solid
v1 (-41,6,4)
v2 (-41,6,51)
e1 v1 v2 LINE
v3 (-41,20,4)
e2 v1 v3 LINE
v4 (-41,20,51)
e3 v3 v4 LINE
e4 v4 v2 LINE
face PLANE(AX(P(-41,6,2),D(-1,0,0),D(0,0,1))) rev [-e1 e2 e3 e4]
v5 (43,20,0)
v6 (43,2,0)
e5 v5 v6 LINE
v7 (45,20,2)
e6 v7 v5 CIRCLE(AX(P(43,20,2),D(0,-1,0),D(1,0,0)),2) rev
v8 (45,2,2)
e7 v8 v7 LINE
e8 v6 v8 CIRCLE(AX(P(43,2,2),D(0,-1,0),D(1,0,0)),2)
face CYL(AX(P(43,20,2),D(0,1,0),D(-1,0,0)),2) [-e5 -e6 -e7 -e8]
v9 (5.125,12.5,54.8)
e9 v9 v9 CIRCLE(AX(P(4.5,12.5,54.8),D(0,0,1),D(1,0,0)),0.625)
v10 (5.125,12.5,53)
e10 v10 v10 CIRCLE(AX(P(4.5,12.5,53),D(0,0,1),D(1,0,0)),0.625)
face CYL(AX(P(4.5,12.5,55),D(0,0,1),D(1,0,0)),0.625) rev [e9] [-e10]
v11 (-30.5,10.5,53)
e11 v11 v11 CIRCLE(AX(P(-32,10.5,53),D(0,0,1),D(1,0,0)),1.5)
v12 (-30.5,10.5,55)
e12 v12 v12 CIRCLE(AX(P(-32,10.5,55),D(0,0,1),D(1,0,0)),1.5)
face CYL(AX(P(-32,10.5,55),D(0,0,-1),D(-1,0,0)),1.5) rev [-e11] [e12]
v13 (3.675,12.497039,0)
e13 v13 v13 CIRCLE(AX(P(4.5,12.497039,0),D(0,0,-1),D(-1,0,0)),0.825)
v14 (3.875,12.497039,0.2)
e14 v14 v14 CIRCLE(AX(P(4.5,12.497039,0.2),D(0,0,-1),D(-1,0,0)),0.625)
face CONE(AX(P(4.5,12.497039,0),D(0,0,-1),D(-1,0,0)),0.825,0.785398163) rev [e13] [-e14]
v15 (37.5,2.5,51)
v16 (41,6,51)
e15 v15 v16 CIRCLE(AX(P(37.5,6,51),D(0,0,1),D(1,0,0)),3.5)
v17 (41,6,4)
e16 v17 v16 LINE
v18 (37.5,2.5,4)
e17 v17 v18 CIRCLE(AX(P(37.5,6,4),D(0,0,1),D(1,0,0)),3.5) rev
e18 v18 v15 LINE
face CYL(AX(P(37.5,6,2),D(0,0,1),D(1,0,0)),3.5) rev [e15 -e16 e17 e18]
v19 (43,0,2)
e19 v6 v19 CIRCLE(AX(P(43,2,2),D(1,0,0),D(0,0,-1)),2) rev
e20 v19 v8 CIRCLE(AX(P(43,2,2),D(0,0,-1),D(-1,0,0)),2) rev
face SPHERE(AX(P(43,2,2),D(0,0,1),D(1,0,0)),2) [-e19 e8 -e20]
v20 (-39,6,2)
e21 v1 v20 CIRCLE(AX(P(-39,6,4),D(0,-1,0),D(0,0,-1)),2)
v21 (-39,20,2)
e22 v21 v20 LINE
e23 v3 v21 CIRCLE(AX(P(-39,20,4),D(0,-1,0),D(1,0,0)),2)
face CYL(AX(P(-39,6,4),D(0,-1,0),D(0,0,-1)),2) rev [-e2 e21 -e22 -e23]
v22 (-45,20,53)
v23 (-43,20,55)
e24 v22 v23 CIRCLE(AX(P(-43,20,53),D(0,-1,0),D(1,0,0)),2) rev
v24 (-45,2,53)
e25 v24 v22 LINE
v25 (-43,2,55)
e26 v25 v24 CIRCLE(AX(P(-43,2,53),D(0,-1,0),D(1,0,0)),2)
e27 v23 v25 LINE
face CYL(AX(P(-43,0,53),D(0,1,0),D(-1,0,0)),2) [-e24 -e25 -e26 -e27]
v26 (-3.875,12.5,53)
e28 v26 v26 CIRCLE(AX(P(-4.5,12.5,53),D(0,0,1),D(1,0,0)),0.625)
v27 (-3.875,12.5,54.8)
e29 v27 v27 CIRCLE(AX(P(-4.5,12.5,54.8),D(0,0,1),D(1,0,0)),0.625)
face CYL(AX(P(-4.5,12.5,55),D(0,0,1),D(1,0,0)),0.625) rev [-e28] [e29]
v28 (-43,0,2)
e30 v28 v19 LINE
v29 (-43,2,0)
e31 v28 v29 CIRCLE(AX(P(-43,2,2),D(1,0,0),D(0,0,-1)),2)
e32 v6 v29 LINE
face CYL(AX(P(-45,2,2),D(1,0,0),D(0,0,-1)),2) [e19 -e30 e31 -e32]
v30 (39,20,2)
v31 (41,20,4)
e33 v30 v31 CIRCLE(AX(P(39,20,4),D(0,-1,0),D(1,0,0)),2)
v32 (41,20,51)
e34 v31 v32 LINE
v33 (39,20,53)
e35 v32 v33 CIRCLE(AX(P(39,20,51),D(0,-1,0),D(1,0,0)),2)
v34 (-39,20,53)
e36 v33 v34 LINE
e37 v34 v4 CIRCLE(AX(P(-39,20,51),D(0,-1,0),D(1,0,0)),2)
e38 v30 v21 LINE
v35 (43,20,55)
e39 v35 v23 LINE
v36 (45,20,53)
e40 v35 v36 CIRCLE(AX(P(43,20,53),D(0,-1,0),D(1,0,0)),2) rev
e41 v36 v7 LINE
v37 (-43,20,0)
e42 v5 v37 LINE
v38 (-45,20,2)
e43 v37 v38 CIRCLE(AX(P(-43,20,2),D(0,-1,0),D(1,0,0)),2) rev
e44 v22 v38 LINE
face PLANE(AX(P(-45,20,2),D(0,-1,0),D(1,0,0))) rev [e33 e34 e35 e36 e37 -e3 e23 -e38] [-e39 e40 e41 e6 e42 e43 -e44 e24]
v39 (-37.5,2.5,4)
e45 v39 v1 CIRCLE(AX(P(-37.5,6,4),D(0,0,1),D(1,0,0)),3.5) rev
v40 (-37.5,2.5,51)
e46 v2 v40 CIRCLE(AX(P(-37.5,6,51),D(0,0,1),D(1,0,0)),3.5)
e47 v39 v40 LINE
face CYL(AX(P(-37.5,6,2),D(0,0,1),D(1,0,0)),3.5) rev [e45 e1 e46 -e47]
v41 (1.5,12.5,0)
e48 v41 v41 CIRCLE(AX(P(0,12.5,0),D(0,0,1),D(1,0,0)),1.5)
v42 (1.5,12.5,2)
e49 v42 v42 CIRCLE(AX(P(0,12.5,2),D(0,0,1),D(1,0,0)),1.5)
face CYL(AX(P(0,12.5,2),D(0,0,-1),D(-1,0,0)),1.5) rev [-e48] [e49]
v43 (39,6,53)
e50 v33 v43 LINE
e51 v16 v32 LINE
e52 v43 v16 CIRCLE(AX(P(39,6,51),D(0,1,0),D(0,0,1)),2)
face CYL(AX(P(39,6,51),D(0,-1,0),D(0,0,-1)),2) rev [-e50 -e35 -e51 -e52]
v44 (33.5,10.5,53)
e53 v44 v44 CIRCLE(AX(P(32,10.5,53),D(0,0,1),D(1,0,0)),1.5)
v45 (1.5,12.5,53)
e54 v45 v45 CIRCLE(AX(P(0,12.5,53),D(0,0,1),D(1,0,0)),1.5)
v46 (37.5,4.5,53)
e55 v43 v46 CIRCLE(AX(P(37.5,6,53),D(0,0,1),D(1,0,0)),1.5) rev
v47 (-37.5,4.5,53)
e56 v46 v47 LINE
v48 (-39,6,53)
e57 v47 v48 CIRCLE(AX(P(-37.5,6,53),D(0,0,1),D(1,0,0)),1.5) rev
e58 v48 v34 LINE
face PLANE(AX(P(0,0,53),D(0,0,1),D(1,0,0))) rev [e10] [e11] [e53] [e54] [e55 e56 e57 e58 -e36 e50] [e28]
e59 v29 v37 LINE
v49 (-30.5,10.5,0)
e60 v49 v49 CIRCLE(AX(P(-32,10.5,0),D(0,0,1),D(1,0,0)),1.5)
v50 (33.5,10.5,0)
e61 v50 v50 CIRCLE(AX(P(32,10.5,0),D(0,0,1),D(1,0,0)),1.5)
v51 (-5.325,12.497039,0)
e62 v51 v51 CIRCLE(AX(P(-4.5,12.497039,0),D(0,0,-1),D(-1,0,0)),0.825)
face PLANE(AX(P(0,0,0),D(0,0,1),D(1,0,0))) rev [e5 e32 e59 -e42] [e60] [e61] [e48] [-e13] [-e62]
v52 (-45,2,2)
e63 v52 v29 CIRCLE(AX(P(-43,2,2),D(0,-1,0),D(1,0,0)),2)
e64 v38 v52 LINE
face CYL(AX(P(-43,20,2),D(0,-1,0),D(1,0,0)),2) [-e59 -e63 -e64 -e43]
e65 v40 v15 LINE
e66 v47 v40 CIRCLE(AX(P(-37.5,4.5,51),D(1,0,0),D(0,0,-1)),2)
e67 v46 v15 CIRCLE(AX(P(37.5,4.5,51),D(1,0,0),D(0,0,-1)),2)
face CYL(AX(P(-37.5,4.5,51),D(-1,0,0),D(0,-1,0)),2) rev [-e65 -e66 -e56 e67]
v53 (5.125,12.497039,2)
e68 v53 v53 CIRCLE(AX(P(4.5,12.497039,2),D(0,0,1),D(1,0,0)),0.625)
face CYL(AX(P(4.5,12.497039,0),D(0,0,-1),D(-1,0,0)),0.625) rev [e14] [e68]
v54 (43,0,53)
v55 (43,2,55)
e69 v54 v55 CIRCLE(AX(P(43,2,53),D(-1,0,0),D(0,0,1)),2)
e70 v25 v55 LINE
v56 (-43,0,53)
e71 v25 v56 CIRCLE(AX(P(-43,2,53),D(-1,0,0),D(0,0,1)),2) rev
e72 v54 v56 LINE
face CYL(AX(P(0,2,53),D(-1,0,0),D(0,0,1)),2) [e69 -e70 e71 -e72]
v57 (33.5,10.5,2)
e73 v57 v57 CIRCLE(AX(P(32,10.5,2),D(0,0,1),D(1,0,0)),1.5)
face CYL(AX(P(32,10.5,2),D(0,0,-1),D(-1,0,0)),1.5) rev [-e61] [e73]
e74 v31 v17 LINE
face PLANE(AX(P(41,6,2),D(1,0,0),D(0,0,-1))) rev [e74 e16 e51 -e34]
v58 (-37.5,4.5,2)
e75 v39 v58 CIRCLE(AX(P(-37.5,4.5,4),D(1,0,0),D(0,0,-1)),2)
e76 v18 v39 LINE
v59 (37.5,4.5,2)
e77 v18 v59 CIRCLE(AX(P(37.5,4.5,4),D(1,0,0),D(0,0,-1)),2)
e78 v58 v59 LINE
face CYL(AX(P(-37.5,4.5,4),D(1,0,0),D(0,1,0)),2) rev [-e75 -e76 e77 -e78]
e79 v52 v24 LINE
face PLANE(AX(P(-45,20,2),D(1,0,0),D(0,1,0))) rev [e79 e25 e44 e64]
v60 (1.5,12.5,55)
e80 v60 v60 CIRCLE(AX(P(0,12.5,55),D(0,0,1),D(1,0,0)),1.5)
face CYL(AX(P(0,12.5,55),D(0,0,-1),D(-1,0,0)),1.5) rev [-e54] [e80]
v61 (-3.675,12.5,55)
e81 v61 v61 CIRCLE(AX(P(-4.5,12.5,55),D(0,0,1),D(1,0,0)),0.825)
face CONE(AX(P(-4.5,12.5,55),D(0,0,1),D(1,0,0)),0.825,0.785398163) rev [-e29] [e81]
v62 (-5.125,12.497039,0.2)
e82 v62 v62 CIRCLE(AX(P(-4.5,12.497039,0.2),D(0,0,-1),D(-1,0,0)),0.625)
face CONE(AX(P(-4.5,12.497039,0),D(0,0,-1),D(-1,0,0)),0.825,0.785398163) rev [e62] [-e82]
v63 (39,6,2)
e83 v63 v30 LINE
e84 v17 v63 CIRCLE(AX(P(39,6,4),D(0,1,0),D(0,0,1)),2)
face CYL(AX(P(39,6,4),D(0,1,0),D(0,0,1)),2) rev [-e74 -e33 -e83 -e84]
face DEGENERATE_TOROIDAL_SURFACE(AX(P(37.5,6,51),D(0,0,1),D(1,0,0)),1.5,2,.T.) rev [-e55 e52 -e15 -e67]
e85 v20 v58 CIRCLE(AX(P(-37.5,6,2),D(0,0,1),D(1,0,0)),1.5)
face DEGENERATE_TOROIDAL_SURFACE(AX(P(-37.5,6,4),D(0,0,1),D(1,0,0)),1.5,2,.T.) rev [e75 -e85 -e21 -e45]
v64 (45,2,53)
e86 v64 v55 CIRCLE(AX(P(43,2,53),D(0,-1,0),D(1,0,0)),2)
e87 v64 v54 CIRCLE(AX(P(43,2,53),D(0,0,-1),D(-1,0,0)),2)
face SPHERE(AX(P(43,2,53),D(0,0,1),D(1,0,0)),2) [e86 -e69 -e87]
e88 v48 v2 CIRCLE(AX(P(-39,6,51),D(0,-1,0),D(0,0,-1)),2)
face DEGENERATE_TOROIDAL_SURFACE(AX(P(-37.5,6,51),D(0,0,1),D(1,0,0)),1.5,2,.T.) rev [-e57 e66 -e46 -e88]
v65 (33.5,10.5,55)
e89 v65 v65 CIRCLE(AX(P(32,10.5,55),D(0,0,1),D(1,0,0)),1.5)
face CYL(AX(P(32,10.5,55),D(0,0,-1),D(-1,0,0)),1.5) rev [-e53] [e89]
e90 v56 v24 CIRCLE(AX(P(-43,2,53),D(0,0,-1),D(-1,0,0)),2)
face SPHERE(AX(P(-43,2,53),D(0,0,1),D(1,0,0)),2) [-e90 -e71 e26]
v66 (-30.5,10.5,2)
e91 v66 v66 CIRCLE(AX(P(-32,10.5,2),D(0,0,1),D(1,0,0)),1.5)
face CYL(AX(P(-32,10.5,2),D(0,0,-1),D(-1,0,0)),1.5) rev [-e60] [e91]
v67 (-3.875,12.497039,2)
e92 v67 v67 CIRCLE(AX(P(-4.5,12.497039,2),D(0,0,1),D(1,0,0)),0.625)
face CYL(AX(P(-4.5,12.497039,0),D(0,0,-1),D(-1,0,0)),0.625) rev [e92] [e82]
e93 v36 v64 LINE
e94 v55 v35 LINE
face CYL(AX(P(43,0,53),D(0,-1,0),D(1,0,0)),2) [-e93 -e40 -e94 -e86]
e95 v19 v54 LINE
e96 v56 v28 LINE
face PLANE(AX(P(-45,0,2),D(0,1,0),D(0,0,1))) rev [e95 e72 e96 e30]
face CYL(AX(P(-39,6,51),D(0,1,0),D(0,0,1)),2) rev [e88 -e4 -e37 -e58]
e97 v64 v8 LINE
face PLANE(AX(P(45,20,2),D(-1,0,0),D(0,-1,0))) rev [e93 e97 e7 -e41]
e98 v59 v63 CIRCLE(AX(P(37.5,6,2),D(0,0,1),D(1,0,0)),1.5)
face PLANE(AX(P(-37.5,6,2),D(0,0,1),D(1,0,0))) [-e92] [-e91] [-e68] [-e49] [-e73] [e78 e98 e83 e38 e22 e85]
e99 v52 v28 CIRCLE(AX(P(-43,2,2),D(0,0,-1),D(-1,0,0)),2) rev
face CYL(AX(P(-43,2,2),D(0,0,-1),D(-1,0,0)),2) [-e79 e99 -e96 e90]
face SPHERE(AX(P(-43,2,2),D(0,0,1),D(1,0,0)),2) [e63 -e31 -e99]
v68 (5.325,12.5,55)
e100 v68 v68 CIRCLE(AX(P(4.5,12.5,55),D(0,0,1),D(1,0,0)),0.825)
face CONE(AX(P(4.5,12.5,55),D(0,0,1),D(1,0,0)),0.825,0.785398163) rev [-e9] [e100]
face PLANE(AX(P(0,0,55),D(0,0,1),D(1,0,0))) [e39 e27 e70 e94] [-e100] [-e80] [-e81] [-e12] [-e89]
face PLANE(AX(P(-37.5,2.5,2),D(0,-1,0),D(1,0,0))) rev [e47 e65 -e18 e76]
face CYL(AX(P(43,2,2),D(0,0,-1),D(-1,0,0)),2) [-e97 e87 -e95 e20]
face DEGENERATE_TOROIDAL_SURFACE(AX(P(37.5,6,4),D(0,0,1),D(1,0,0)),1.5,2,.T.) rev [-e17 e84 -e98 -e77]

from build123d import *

# Parameters (mm, degrees)
ESQUISSE1_W                   = 90
ESQUISSE1_H                   = 20
ESQUISSE1_R                   = 1.5
BOSS_EXTRU_1_DEPTH            = 2
ESQUISSE2_W                   = 90
ESQUISSE2_H                   = 20
BOSS_EXTRU_2_DEPTH            = 51
ENL_V_MAT_EXTRU_2_DEPTH       = 51
ESQUISSE6_W                   = 90
ESQUISSE6_H                   = 20
ESQUISSE6_R                   = 1.5
BOSS_EXTRU_4_DEPTH            = 2
TROU_TARAUD_M1_61_D           = 1.25
TROU_TARAUD_M1_61_DEPTH       = 2
TROU_TARAUD_M1_61_CSINK_D     = 1.65
TROU_TARAUD_M1_61_CSINK_ANGLE = 90
TROU_TARAUD_M1_62_D           = 1.25
TROU_TARAUD_M1_62_DEPTH       = 2
TROU_TARAUD_M1_62_CSINK_D     = 1.65
TROU_TARAUD_M1_62_CSINK_ANGLE = 90
CONG_1_R                      = 2
CONG_2_R                      = 2
CONG_3_R                      = 2
CONG_4_R                      = 2


with BuildPart() as part:
    # Esquisse1 → Boss.-Extru.1 (new body)
    with BuildSketch(Plane.XY):
        with Locations((0, 10)):
            Rectangle(ESQUISSE1_W, ESQUISSE1_H)
        with Locations((-32, 10.5)):
            Circle(ESQUISSE1_R, mode=Mode.SUBTRACT)
        with Locations((32, 10.5)):
            Circle(ESQUISSE1_R, mode=Mode.SUBTRACT)
        with Locations((0, 12.5)):
            Circle(ESQUISSE1_R, mode=Mode.SUBTRACT)
    extrude(amount=BOSS_EXTRU_1_DEPTH)

    # Esquisse2 → Boss.-Extru.2 (add)
    with BuildSketch(Plane.XY.offset(2)):
        with Locations((0, 10)):
            Rectangle(ESQUISSE2_W, ESQUISSE2_H)
    extrude(amount=BOSS_EXTRU_2_DEPTH)

    # Esquisse4 → Enlèv. mat.-Extru.2 (cut)
    with BuildSketch(Plane.XY.offset(53)):
        with BuildLine():
            Line((-37.5, 2.5), (37.5, 2.5))
            ThreePointArc((37.5, 2.5), (39.974873734, 3.525126266), (41, 6))
            Line((41, 6), (41, 20))
            Line((41, 20), (-41, 20))
            Line((-41, 20), (-41, 6))
            ThreePointArc((-41, 6), (-39.974873734, 3.525126266), (-37.5, 2.5))
        make_face()
    extrude(amount=-ENL_V_MAT_EXTRU_2_DEPTH, mode=Mode.SUBTRACT)

    # Esquisse6 → Boss.-Extru.4 (add)
    with BuildSketch(Plane.XY.offset(53)):
        with Locations((0, 10)):
            Rectangle(ESQUISSE6_W, ESQUISSE6_H)
        with Locations((32, 10.5)):
            Circle(ESQUISSE6_R, mode=Mode.SUBTRACT)
        with Locations((0, 12.5)):
            Circle(ESQUISSE6_R, mode=Mode.SUBTRACT)
        with Locations((-32, 10.5)):
            Circle(ESQUISSE6_R, mode=Mode.SUBTRACT)
    extrude(amount=BOSS_EXTRU_4_DEPTH)

    # Trou taraudé M1.61
    with Locations(Plane.XY.offset(55)):
        with Locations((-4.5, 12.5), (4.5, 12.5)):
            CounterSinkHole(TROU_TARAUD_M1_61_D / 2, TROU_TARAUD_M1_61_CSINK_D / 2, depth=TROU_TARAUD_M1_61_DEPTH, counter_sink_angle=TROU_TARAUD_M1_61_CSINK_ANGLE)

    # Trou taraudé M1.62
    with Locations(Plane(origin=(0, 0, 0), x_dir=(-1, 0, 0), z_dir=(0, 0, -1))):
        with Locations((-4.5, 12.497038502), (4.5, 12.497038502)):
            CounterSinkHole(TROU_TARAUD_M1_62_D / 2, TROU_TARAUD_M1_62_CSINK_D / 2, depth=TROU_TARAUD_M1_62_DEPTH, counter_sink_angle=TROU_TARAUD_M1_62_CSINK_ANGLE)

    # Congé1
    cong_1_edges = [part.edges().sort_by_distance(p)[0] for p in [
        (-39.974873734, 3.525126266, 2),
        (-41, 13, 2),
        (41, 13, 2),
        (39.974873734, 3.525126266, 2),
        (0, 2.5, 2),
    ]]
    fillet(cong_1_edges, radius=CONG_1_R)

    # Congé2
    cong_2_edges = [part.edges().sort_by_distance(p)[0] for p in [
        (-39.974873734, 3.525126266, 53),
        (0, 2.5, 53),
        (39.974873734, 3.525126266, 53),
        (41, 13, 53),
        (-41, 13, 53),
    ]]
    fillet(cong_2_edges, radius=CONG_2_R)

    # Congé3
    cong_3_edges = [part.edges().sort_by_distance(p)[0] for p in [
        (0, 0, 0),
        (0, 0, 55),
        (45, 0, 27.5),
        (-45, 0, 27.5),
    ]]
    fillet(cong_3_edges, radius=CONG_3_R)

    # Congé4
    # the kernel refuses this fillet: 2 mm, written as the material it takes off along each edge
    with BuildSketch(Plane(origin=(43, 2, 53), x_dir=(0, 0, 1), z_dir=(1, 0, 0))) as cong_4_piece_1_section:
        Polygon((0, 0), (CONG_4_R, 0), (CONG_4_R, CONG_4_R), (0, CONG_4_R), align=None)
    cong_4_piece_1 = extrude(amount=CONG_4_R, mode=Mode.PRIVATE)
    cong_4_piece_1 = cong_4_piece_1 - Plane(origin=(43, 2, 53), x_dir=(0, 0.7071067811865475, -0.7071067811865475), z_dir=(1, 0, 0)) * Sphere(CONG_4_R, mode=Mode.PRIVATE)
    add(cong_4_piece_1, mode=Mode.SUBTRACT)
    with BuildSketch(Plane(origin=(43, 2, 2), x_dir=(1, 0, 0), z_dir=(0, 0, -1))) as cong_4_piece_2_section:
        Polygon((0, 0), (CONG_4_R, 0), (CONG_4_R, CONG_4_R), (0, CONG_4_R), align=None)
    cong_4_piece_2 = extrude(amount=CONG_4_R, mode=Mode.PRIVATE)
    cong_4_piece_2 = cong_4_piece_2 - Plane(origin=(43, 2, 2), x_dir=(-0.7071067811865474, 0.7071067811865477, 0), z_dir=(0, 0, -1)) * Sphere(CONG_4_R, mode=Mode.PRIVATE)
    add(cong_4_piece_2, mode=Mode.SUBTRACT)
    with BuildSketch(Plane(origin=(-43, 2, 53), x_dir=(0, 0, 1), z_dir=(-1, 0, 0))) as cong_4_piece_3_section:
        Polygon((0, 0), (CONG_4_R, 0), (CONG_4_R, -CONG_4_R), (0, -CONG_4_R), align=None)
    cong_4_piece_3 = extrude(amount=CONG_4_R, mode=Mode.PRIVATE)
    cong_4_piece_3 = cong_4_piece_3 - Plane(origin=(-43, 2, 53), x_dir=(0, 0.7071067811865475, -0.7071067811865475), z_dir=(-1, 0, 0)) * Sphere(CONG_4_R, mode=Mode.PRIVATE)
    add(cong_4_piece_3, mode=Mode.SUBTRACT)
    with BuildSketch(Plane(origin=(-43, 2, 2), x_dir=(-1, 0, 0), z_dir=(0, 0, -1))) as cong_4_piece_4_section:
        Polygon((0, 0), (CONG_4_R, 0), (CONG_4_R, -CONG_4_R), (0, -CONG_4_R), align=None)
    cong_4_piece_4 = extrude(amount=CONG_4_R, mode=Mode.PRIVATE)
    cong_4_piece_4 = cong_4_piece_4 - Plane(origin=(-43, 2, 2), x_dir=(0.7071067811865474, 0.7071067811865477, 0), z_dir=(0, 0, -1)) * Sphere(CONG_4_R, mode=Mode.PRIVATE)
    add(cong_4_piece_4, mode=Mode.SUBTRACT)
    with BuildSketch(Plane(origin=(45, 2, 55), x_dir=(0, 0, -1), z_dir=(0, 1, 0)), Plane(origin=(-45, 25, 55), x_dir=(0, 0, -1), z_dir=(0, -1, 0))) as cong_4_piece_5:
        with BuildLine():
            CenterArc((CONG_4_R, CONG_4_R), CONG_4_R, 180, 90)
            Line((0, CONG_4_R), (0, 0))
            Line((0, 0), (CONG_4_R, 0))
        make_face()
    extrude(amount=23, mode=Mode.SUBTRACT)
    with BuildSketch(Plane(origin=(45, 25, 0), x_dir=(-1, 0, 0), z_dir=(0, -1, 0)), Plane(origin=(-45, 2, 0), x_dir=(1, 0, 0), z_dir=(0, 1, 0))) as cong_4_piece_6:
        with BuildLine():
            CenterArc((CONG_4_R, -CONG_4_R), CONG_4_R, 90, 90)
            Line((0, -CONG_4_R), (0, 0))
            Line((0, 0), (CONG_4_R, 0))
        make_face()
    extrude(amount=23, mode=Mode.SUBTRACT)


solid = part.part
